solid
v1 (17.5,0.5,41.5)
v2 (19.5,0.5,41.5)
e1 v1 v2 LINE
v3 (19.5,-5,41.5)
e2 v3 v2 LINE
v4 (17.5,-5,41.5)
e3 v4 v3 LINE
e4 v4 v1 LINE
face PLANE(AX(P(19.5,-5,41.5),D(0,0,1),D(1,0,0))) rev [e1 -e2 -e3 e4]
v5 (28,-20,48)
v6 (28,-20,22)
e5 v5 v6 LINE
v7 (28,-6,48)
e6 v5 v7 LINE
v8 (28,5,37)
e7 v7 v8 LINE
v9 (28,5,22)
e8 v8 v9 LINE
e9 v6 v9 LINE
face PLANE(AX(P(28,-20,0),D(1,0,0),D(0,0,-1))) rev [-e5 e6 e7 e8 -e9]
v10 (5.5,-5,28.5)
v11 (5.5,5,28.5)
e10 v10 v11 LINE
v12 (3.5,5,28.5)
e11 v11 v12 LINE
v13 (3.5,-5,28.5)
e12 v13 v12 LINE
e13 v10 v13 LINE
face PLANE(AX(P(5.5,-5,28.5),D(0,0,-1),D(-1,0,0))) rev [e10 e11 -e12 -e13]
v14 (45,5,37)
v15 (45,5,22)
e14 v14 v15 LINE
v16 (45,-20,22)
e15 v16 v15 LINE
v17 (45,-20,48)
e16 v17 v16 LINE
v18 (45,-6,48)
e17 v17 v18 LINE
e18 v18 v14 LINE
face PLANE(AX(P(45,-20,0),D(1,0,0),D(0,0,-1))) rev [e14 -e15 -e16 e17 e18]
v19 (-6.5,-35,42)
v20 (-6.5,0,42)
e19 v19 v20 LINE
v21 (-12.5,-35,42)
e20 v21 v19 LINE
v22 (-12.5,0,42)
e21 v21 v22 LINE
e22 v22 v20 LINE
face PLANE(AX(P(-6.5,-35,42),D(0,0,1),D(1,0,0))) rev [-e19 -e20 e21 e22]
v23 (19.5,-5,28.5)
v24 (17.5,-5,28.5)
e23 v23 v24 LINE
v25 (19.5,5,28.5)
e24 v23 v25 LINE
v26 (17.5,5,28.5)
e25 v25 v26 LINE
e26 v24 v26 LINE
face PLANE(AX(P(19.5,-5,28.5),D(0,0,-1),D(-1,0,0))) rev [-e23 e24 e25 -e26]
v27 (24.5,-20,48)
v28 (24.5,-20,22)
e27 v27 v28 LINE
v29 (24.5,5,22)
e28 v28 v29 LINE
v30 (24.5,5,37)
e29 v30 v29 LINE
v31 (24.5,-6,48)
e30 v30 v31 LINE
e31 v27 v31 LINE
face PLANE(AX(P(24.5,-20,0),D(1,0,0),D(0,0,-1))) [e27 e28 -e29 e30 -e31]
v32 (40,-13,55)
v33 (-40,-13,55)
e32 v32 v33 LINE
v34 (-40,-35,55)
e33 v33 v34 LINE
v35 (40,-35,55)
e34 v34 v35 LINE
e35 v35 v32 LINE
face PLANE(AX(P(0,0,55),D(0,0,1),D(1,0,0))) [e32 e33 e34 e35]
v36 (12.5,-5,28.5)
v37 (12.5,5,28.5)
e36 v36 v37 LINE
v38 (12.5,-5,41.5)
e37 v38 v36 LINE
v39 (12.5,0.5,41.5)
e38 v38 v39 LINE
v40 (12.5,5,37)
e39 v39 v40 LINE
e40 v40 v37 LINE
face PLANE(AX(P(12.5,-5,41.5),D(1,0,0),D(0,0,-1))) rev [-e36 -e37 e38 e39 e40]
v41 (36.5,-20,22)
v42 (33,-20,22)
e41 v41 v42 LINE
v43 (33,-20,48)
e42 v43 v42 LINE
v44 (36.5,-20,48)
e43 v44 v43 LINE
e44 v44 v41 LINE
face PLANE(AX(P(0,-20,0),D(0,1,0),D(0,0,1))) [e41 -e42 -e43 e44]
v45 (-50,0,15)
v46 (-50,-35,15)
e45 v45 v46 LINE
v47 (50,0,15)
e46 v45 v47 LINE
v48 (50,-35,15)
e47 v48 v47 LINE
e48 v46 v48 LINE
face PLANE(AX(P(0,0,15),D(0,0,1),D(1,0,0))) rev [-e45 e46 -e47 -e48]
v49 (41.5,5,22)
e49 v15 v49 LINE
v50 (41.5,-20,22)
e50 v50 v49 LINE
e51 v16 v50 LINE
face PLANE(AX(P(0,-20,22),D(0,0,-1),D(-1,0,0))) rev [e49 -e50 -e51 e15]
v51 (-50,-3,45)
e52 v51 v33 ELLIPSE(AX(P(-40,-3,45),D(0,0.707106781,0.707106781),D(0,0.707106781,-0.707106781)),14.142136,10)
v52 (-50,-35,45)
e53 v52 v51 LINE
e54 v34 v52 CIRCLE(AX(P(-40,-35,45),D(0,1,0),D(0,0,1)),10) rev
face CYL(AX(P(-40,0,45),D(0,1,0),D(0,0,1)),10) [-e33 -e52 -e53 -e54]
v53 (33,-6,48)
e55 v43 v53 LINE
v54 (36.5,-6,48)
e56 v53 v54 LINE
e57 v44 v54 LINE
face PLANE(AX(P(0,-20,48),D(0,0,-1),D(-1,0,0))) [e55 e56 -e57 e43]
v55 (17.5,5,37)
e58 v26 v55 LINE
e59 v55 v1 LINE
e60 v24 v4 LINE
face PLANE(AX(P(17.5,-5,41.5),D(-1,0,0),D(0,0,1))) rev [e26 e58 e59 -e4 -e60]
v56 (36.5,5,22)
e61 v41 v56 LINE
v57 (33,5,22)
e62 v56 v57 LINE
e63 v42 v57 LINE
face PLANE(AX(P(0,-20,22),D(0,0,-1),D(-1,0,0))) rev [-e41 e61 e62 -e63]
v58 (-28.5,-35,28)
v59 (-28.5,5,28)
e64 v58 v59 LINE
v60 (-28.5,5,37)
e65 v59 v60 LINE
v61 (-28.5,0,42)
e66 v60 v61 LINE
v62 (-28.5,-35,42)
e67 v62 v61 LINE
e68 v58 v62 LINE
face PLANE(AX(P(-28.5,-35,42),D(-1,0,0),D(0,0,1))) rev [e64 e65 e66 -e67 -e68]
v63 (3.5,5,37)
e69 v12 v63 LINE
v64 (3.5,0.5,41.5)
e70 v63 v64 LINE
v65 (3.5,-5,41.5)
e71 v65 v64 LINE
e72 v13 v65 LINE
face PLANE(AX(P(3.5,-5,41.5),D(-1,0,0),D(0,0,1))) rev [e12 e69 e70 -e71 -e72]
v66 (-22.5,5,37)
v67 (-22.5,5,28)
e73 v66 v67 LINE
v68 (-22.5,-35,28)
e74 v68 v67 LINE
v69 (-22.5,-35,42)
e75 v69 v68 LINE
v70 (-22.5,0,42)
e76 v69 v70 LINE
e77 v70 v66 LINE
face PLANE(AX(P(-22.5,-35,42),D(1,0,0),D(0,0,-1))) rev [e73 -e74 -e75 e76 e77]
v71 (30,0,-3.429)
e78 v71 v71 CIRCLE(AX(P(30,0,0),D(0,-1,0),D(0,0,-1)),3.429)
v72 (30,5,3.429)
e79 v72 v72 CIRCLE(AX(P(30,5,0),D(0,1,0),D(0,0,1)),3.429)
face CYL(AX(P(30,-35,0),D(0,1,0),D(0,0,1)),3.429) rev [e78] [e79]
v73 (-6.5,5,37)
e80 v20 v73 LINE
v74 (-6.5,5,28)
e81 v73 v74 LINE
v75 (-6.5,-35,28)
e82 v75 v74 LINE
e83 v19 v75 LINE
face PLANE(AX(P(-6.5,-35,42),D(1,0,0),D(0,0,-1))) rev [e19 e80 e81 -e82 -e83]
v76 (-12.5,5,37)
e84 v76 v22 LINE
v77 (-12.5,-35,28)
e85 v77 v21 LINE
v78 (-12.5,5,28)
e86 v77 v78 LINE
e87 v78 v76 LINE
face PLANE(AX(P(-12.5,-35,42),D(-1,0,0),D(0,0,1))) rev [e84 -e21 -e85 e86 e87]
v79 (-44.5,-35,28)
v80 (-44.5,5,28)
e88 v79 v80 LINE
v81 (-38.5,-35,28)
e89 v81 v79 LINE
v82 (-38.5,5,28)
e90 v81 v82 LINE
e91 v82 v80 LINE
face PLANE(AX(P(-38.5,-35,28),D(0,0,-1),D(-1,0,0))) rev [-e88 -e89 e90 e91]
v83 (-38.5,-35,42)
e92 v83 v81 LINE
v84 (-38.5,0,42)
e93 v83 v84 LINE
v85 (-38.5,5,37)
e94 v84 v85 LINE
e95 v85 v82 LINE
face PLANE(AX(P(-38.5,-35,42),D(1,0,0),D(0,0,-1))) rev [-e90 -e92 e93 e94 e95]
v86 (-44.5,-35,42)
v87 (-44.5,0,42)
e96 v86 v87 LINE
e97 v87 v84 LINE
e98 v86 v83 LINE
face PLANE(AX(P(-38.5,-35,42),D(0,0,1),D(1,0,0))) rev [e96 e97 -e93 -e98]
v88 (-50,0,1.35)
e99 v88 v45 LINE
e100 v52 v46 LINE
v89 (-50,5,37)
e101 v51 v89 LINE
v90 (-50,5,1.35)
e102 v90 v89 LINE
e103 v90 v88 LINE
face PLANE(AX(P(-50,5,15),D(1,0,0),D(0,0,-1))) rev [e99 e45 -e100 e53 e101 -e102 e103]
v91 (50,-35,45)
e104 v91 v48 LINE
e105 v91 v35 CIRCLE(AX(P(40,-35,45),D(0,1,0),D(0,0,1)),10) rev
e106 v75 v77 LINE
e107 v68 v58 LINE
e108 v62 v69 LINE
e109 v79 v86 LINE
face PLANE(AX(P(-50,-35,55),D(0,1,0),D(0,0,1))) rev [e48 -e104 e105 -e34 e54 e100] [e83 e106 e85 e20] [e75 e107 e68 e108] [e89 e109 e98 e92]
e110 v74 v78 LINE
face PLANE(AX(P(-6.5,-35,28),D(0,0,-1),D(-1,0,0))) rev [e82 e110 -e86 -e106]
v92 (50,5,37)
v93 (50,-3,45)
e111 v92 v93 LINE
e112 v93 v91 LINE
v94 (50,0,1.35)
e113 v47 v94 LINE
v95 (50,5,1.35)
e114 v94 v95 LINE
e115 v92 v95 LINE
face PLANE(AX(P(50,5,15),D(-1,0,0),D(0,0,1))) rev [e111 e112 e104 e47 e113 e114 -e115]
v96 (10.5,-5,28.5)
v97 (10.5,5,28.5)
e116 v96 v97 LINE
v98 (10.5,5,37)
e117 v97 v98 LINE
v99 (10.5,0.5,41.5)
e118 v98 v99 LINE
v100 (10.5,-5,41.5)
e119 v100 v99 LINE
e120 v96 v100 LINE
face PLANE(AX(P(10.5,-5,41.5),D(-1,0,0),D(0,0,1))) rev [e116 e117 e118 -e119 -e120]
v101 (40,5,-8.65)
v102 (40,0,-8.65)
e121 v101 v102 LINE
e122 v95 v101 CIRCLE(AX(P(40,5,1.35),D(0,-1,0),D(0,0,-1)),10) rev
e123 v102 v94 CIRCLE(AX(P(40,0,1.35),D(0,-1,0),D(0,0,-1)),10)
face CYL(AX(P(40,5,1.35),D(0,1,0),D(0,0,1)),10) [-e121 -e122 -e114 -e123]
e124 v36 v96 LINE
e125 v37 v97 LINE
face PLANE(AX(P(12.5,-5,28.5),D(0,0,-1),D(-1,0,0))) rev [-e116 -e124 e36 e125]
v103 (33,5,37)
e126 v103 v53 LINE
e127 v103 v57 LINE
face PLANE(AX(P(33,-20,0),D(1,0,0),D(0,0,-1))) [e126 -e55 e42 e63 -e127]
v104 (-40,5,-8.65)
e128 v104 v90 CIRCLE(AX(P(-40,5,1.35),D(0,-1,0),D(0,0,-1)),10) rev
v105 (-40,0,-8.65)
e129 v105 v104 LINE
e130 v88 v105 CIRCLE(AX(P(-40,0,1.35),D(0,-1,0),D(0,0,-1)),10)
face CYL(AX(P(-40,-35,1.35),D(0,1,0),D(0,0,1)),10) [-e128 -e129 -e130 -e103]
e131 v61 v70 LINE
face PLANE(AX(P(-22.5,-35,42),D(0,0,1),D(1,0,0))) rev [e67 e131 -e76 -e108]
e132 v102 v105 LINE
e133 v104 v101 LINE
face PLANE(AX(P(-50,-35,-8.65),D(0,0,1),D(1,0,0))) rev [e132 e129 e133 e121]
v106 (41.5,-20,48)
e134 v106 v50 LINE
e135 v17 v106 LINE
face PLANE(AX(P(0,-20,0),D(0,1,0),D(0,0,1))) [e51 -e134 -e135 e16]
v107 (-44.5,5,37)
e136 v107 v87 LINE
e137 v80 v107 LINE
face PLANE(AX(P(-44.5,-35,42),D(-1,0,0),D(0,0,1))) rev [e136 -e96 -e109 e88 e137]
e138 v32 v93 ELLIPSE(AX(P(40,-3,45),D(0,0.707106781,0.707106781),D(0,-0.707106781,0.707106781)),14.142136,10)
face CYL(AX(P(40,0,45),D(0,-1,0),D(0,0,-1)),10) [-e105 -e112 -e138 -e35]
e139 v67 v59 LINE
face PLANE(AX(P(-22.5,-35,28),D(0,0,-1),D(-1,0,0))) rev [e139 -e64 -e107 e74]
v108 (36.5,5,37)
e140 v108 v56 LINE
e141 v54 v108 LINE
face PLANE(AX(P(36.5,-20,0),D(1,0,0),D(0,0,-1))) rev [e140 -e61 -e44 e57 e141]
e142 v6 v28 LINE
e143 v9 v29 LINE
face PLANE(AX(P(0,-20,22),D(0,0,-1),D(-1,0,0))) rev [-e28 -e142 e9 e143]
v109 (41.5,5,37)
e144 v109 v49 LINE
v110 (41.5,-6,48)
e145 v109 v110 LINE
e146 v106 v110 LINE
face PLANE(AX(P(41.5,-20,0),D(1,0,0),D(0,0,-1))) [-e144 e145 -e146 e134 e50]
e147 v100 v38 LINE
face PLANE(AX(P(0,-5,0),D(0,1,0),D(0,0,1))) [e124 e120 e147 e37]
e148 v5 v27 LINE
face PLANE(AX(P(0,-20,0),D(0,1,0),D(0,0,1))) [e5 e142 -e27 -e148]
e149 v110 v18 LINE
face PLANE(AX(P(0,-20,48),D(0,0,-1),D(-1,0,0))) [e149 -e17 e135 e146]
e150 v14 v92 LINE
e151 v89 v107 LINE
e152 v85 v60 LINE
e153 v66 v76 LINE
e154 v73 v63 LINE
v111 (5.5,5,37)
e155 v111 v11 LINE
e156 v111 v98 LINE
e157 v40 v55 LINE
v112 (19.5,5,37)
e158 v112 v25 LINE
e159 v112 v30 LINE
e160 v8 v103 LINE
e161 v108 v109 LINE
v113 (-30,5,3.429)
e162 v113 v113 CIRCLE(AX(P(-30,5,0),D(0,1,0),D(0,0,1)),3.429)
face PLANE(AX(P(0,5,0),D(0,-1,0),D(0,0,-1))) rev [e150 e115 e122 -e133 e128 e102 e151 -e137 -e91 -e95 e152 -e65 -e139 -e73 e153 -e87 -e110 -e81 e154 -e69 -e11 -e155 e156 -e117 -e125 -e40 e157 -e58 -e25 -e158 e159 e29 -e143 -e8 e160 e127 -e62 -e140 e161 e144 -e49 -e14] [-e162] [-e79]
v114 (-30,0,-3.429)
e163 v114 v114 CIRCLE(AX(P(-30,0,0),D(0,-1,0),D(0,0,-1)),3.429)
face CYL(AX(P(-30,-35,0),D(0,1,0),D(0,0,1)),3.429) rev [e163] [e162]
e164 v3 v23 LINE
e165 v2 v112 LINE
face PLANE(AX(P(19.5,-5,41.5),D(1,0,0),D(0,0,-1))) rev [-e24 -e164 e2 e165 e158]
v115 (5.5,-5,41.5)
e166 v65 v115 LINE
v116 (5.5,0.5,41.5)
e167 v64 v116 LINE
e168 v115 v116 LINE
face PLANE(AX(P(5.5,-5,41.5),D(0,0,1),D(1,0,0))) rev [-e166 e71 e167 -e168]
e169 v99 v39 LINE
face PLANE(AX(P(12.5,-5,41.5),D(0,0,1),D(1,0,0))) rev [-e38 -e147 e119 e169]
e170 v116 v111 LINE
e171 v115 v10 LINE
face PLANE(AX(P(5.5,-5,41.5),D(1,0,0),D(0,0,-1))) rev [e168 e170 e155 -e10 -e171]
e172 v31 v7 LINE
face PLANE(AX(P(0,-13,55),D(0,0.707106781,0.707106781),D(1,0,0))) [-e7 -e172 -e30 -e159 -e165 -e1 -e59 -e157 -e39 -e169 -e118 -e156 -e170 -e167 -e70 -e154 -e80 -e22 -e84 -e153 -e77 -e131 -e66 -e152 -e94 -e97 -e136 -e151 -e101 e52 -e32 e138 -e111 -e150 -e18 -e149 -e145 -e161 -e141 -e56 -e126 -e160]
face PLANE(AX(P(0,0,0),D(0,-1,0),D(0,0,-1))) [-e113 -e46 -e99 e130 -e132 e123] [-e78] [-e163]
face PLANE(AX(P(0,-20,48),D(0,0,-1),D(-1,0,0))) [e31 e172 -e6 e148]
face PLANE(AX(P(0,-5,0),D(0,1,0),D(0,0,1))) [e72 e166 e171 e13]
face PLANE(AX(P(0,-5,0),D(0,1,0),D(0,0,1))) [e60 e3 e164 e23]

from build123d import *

# Parameters (mm, degrees)
SKETCH1_W           = 100
SKETCH1_H           = 30
BOSS_EXTRUDE1_DEPTH = 5
SKETCH2_W           = 100
SKETCH2_H           = 40
BOSS_EXTRUDE2_DEPTH = 40
SKETCH3_W           = 3.5
SKETCH3_H           = 26
CUT_EXTRUDE1_DEPTH  = 25
SKETCH4_W           = 2
SKETCH4_H           = 13
CUT_EXTRUDE2_DEPTH  = 10
SKETCH5_W           = 6
SKETCH5_H           = 14
CUT_EXTRUDE3_DEPTH  = 85.409715081
CHAMFER1_SIZE       = 18
SKETCH6_R           = 3.429
CUT_EXTRUDE4_DEPTH  = 85.409715081
SKETCH7_W           = 100
SKETCH7_H           = 6.35
CUT_EXTRUDE5_DEPTH  = 85.409715081
FILLET1_R           = 10


with BuildPart() as part:
    # Sketch1 → Boss-Extrude1 (new body)
    with BuildSketch(Plane(origin=(0, 0, 0), x_dir=(1, 0, 0), z_dir=(0, 1, 0))):
        Rectangle(SKETCH1_W, SKETCH1_H)
    extrude(amount=BOSS_EXTRUDE1_DEPTH)

    # Sketch2 → Boss-Extrude2 (add)
    with BuildSketch(Plane.XY.offset(15)):
        with Locations((0, -15)):
            Rectangle(SKETCH2_W, SKETCH2_H)
    extrude(amount=BOSS_EXTRUDE2_DEPTH)

    # Sketch3 → Cut-Extrude1 (cut)
    with BuildSketch(Plane(origin=(0, 5, 0), x_dir=(1, 0, 0), z_dir=(0, 1, 0))):
        with Locations((43.25, -35)):
            Rectangle(SKETCH3_W, SKETCH3_H)
        with Locations((34.75, -35)):
            Rectangle(SKETCH3_W, SKETCH3_H)
        with Locations((26.25, -35)):
            Rectangle(SKETCH3_W, SKETCH3_H)
    extrude(amount=-CUT_EXTRUDE1_DEPTH, mode=Mode.SUBTRACT)

    # Sketch4 → Cut-Extrude2 (cut)
    with BuildSketch(Plane(origin=(0, 5, 0), x_dir=(1, 0, 0), z_dir=(0, 1, 0))):
        with Locations((18.5, -35)):
            Rectangle(SKETCH4_W, SKETCH4_H)
        with Locations((11.5, -35)):
            Rectangle(SKETCH4_W, SKETCH4_H)
        with Locations((4.5, -35)):
            Rectangle(SKETCH4_W, SKETCH4_H)
    extrude(amount=-CUT_EXTRUDE2_DEPTH, mode=Mode.SUBTRACT)

    # Sketch5 → Cut-Extrude3 (cut, through all)
    with BuildSketch(Plane(origin=(0, 5, 0), x_dir=(1, 0, 0), z_dir=(0, 1, 0))):
        with Locations((-9.5, -35)):
            Rectangle(SKETCH5_W, SKETCH5_H)
        with Locations((-25.5, -35)):
            Rectangle(SKETCH5_W, SKETCH5_H)
        with Locations((-41.5, -35)):
            Rectangle(SKETCH5_W, SKETCH5_H)
    extrude(amount=-CUT_EXTRUDE3_DEPTH, mode=Mode.SUBTRACT)

    # Chamfer1
    # the kernel refuses this chamfer: 18 mm, written as the material it takes off along each edge
    with BuildSketch(Plane(origin=(-96.290293783, 5, 55), x_dir=(0, -0.9996219169112966, 0.02749587661058639), z_dir=(1, 0, 0))) as chamfer1_piece_1:
        Polygon((CHAMFER1_SIZE * 0.999621916911, CHAMFER1_SIZE * 0.0274958766106), (-CHAMFER1_SIZE * 0.0274958766106, CHAMFER1_SIZE * 0.999621916911), (0, 0), align=None)
    extrude(amount=192.580587567, mode=Mode.SUBTRACT)

    # Sketch6 → Cut-Extrude4 (cut, through all)
    with BuildSketch(Plane(origin=(0, 5, 0), x_dir=(1, 0, 0), z_dir=(0, 1, 0))):
        with Locations(Location((-30, 0, 0), (0, 0, 270))):
            Circle(SKETCH6_R)
        with Locations(Location((30, 0, 0), (0, 0, 270))):
            Circle(SKETCH6_R)
    extrude(amount=-CUT_EXTRUDE4_DEPTH, mode=Mode.SUBTRACT)

    # Sketch7 → Cut-Extrude5 (cut, through all)
    with BuildSketch(Plane(origin=(0, 5, 0), x_dir=(1, 0, 0), z_dir=(0, 1, 0))):
        with Locations((0, 11.825)):
            Rectangle(SKETCH7_W, SKETCH7_H)
    extrude(amount=-CUT_EXTRUDE5_DEPTH, mode=Mode.SUBTRACT)

    # Fillet1
    fillet1_edges = [part.edges().sort_by_distance(p)[0] for p in [
        (-50, -24, 55),
        (50, -24, 55),
        (-50, 2.5, -8.65),
        (50, 2.5, -8.65),
    ]]
    fillet(fillet1_edges, radius=FILLET1_R)


solid = part.part
